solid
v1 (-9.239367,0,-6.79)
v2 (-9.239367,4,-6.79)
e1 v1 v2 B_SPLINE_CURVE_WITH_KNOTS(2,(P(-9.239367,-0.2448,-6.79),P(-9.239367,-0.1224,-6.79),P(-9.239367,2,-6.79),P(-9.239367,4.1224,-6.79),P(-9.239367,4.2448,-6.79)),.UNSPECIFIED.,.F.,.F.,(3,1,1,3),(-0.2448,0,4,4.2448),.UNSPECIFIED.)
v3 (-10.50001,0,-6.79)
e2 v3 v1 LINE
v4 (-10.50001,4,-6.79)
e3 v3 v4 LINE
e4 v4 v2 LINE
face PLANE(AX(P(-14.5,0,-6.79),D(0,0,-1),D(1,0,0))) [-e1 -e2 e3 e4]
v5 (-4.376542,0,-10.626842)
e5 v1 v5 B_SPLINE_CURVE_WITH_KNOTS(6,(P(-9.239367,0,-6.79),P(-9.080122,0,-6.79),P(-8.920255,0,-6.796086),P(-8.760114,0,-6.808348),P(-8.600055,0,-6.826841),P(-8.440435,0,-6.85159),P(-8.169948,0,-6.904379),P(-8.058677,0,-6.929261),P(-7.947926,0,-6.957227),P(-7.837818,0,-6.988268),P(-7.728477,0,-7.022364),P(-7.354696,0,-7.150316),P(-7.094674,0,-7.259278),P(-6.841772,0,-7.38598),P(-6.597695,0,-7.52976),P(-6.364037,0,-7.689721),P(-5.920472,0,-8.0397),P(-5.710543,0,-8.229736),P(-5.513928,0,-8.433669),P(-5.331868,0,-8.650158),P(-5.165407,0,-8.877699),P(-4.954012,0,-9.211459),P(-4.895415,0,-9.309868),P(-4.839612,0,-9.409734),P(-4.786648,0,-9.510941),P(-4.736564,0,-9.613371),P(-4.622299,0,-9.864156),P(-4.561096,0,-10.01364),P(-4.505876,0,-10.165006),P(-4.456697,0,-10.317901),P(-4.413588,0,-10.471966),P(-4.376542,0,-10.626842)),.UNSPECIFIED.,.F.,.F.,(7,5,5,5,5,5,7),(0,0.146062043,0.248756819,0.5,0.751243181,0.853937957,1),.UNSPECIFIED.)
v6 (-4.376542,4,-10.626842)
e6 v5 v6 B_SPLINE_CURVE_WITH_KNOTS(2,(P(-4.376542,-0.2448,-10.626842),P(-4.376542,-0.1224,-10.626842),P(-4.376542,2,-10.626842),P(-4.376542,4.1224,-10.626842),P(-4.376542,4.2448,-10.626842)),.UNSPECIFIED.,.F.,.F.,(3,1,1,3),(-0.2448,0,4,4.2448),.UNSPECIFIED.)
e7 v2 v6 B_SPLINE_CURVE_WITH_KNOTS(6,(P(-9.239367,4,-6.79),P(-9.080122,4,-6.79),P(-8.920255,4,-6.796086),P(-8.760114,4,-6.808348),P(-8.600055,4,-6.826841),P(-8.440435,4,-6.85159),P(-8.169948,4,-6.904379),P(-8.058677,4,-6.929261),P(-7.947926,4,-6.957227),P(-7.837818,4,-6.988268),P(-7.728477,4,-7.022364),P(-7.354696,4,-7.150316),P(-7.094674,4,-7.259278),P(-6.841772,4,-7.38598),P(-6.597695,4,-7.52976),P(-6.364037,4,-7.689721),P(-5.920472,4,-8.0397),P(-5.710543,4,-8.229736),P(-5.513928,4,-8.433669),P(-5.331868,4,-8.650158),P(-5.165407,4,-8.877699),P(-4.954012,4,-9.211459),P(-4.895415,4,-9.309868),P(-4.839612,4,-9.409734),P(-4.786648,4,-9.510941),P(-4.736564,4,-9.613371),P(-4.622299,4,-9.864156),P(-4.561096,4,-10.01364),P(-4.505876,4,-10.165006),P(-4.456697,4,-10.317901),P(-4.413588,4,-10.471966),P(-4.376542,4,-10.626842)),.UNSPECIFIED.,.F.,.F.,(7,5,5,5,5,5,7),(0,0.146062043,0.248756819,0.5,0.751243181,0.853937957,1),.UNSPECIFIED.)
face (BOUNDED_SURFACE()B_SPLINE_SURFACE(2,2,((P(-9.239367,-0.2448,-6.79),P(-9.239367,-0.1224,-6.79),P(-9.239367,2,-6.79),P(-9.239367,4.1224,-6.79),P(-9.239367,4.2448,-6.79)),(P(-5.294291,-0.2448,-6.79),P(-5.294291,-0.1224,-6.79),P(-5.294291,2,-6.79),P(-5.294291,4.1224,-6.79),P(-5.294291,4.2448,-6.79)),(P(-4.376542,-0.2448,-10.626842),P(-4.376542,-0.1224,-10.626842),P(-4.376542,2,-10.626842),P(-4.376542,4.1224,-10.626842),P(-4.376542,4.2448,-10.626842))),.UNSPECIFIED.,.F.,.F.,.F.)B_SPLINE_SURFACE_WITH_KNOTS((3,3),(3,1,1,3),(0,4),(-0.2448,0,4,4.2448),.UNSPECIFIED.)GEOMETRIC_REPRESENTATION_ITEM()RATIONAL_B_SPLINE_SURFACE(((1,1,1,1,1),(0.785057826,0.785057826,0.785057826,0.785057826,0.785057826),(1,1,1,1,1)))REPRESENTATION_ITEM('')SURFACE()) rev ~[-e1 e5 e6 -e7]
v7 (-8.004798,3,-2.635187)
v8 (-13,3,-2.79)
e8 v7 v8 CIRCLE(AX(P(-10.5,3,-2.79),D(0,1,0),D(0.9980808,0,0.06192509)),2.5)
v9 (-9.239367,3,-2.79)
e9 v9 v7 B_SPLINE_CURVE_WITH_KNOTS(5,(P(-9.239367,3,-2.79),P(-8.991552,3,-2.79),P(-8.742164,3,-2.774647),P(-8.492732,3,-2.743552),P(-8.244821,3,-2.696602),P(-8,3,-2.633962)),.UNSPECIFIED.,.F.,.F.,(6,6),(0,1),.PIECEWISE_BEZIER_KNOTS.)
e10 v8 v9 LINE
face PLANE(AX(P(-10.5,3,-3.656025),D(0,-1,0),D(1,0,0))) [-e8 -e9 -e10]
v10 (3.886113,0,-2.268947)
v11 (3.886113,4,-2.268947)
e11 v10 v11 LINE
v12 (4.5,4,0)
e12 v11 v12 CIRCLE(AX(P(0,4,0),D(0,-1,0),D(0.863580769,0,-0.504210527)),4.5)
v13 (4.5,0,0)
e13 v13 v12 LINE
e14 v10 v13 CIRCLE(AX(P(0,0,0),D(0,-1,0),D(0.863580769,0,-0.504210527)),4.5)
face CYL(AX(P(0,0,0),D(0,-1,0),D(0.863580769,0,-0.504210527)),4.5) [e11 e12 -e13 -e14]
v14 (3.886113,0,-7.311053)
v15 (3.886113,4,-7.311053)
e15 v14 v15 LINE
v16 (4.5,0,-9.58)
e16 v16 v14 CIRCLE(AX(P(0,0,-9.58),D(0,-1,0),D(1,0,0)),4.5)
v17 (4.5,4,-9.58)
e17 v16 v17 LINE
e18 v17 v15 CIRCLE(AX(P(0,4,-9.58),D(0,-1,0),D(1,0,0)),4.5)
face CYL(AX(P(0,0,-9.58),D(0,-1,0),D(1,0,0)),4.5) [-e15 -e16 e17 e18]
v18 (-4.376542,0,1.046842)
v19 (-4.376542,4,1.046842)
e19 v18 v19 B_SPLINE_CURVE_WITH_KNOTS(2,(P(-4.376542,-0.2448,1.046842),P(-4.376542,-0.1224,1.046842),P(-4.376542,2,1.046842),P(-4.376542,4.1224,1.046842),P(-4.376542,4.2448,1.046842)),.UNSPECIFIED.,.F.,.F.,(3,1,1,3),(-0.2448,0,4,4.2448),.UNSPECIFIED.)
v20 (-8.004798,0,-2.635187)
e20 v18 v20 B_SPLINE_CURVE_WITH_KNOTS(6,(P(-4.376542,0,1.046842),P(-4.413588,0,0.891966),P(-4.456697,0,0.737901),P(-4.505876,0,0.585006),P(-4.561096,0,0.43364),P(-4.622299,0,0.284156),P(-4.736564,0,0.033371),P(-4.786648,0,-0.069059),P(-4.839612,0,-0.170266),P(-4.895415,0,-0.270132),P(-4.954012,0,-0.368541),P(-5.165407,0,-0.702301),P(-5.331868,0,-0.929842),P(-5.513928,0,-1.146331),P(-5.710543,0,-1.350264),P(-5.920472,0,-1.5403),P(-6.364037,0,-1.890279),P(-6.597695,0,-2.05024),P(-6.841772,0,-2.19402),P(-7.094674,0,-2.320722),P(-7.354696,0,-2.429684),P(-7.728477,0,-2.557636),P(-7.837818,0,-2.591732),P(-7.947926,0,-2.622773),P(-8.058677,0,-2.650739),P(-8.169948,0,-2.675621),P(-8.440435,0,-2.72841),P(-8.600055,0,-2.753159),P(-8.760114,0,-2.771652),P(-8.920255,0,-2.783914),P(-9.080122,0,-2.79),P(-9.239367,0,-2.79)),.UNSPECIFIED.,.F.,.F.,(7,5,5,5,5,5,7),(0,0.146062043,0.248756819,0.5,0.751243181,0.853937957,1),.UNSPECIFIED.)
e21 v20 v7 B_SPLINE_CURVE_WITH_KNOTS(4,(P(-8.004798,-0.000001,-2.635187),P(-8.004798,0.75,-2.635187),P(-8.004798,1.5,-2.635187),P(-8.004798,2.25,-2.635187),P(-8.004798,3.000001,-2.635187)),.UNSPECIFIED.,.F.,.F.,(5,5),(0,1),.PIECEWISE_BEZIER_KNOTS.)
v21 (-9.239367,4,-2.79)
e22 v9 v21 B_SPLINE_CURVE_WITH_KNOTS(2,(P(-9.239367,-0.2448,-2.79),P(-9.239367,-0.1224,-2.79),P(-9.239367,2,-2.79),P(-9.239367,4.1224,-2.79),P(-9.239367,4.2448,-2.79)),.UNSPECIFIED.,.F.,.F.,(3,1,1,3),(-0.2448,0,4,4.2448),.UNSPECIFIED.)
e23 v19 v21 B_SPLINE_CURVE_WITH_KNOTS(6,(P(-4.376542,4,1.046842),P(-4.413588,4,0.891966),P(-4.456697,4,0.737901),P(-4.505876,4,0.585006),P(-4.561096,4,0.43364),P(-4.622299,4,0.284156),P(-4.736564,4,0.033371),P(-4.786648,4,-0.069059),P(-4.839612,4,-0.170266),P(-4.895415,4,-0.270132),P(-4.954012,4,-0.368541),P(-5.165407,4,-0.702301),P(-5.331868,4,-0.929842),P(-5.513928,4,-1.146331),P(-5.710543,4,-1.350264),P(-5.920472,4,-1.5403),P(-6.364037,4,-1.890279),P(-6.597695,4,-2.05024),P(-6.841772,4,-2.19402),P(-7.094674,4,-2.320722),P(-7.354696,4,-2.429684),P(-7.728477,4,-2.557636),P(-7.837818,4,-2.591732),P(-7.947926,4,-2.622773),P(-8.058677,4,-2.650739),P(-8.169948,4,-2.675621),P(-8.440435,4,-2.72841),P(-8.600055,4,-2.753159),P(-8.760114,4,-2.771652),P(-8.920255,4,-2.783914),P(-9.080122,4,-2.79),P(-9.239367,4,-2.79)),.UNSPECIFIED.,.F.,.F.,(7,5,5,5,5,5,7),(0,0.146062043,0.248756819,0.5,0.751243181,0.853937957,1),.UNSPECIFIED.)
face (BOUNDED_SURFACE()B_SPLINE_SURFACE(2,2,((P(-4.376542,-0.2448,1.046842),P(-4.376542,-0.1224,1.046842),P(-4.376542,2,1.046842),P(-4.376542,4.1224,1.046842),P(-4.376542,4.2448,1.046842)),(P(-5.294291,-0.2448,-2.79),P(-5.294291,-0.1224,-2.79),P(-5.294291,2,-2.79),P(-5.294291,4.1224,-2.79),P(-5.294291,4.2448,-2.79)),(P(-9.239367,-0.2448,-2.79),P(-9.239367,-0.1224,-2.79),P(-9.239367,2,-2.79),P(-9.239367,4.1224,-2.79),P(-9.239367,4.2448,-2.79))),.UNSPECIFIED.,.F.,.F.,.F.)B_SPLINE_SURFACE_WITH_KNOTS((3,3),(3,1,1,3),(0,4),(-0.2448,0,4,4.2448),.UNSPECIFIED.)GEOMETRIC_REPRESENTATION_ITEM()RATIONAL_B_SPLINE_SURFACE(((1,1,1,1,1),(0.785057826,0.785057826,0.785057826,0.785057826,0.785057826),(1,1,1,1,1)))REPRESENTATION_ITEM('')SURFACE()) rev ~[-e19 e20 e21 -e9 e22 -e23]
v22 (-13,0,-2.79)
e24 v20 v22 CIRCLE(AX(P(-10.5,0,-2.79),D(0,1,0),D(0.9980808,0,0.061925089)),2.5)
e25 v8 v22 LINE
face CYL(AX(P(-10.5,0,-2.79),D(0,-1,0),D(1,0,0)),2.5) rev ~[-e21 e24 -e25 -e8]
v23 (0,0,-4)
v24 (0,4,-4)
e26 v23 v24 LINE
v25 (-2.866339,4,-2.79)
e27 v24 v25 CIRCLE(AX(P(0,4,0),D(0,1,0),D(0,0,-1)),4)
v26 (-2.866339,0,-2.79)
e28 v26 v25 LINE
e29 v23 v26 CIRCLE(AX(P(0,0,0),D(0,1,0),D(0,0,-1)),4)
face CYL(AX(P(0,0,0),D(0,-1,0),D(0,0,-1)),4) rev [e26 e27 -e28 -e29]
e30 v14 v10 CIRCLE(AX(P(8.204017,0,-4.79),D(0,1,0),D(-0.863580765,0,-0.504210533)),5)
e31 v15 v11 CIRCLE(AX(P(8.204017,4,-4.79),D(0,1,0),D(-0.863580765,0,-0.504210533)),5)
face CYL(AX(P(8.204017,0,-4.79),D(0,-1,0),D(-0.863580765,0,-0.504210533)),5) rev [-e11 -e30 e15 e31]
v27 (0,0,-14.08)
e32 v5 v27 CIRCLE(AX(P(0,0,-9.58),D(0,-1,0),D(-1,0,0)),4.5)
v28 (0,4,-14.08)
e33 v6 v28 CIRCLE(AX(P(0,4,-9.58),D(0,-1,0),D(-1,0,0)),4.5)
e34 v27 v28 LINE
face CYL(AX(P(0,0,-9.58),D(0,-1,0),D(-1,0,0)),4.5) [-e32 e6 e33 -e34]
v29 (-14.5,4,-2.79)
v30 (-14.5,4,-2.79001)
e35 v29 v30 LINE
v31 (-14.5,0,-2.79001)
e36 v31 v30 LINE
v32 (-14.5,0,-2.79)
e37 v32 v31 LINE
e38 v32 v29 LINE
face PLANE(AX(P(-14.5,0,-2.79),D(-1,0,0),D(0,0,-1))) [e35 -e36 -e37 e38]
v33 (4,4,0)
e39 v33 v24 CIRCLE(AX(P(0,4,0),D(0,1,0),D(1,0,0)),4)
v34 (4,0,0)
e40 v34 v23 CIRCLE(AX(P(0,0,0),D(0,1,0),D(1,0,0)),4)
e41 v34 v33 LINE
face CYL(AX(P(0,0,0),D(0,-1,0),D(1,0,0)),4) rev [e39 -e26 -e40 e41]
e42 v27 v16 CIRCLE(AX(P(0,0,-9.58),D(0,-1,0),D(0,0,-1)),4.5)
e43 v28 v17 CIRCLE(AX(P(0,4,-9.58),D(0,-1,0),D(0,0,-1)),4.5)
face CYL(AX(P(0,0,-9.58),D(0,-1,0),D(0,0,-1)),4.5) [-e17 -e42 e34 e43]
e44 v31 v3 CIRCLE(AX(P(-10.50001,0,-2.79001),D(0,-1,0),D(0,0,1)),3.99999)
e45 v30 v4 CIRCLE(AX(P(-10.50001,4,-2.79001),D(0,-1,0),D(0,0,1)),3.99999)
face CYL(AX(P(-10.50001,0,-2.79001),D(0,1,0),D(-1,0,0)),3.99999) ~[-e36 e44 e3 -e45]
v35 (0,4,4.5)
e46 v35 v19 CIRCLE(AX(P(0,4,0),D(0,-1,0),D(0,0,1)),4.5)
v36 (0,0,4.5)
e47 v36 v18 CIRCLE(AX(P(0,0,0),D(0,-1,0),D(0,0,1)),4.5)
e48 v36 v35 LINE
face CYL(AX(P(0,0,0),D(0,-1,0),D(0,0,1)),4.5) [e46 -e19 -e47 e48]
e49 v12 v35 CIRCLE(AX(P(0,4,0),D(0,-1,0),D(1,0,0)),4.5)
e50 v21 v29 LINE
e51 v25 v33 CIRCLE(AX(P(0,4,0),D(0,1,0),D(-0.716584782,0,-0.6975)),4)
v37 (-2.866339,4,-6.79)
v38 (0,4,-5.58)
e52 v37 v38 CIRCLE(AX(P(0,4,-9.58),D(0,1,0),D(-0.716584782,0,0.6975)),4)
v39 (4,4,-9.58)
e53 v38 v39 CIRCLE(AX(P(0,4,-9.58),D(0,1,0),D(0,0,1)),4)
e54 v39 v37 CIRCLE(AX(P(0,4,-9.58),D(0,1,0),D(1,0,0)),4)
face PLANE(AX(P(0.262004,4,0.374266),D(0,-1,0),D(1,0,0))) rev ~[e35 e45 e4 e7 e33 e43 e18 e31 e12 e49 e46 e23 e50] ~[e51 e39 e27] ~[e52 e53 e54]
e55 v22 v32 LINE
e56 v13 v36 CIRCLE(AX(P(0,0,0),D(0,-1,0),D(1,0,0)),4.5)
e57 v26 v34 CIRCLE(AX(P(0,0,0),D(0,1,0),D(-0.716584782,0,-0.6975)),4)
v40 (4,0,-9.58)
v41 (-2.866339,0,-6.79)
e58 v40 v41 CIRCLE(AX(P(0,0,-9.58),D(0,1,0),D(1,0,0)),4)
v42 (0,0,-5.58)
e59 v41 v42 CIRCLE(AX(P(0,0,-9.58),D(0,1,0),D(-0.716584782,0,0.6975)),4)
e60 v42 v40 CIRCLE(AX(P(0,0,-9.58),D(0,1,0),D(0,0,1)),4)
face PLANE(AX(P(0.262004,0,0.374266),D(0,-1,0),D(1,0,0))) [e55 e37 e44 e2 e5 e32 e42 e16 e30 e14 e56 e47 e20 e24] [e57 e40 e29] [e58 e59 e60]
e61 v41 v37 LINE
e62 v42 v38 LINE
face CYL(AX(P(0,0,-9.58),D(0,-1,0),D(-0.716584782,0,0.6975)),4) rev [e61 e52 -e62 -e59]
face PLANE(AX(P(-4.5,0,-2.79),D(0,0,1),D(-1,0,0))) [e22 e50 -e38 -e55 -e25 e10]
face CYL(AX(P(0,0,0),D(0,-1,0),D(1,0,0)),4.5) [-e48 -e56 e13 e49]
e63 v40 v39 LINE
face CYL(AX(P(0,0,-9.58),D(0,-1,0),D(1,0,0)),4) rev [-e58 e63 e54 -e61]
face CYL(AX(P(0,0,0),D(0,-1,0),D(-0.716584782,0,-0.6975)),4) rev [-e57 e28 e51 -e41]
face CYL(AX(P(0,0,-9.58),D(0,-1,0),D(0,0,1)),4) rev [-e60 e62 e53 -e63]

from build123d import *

# Parameters (mm, degrees)
F1_DEPTH = 4
F2_R     = 5
F3_R     = 3.99999
F4_DEPTH = 3


# Not quite as in the source:
# - a fillet or chamfer is up to 0.001 mm smaller than in the source, because OpenCascade refuses the exact size


with BuildPart() as f1:
    # F0 (on Front) → F1 (new body)
    with BuildSketch(Plane.XZ):
        with BuildLine():
            ThreePointArc((4.5, 0), (3.1819805153, 3.1819805153), (0, 4.5))
            ThreePointArc((0, 4.5), (-3.1819805153, 3.1819805153), (-4.5, 0))
            ThreePointArc((-4.5, 0), (-4.2507756145, -1.4767893131), (-3.5307081443, -2.79))
            Line((-3.5307081443, -2.79), (-2.8663391286, -2.79))
            ThreePointArc((-2.8663391286, -2.79), (-1.5057628442, 3.7057628442), (4, 0))
            ThreePointArc((4, 0), (2.8284271247, -2.8284271247), (0, -4))
            Line((0, -4), (0, -4.5))
            ThreePointArc((0, -4.5), (2.2405062847, -3.9025801194), (3.8861134595, -2.2689473726))
            ThreePointArc((3.8861134595, -2.2689473726), (4.3438180537, -1.1752636794), (4.5, 0))
        make_face()
        with BuildLine():
            ThreePointArc((4.5, -9.58), (4.3438180596, -8.4047363422), (3.886113482, -7.3110526659))
            ThreePointArc((3.886113482, -7.3110526659), (2.240506304, -5.6774198917), (0, -5.08))
            Line((0, -5.08), (0, -5.58))
            ThreePointArc((0, -5.58), (2.8284271247, -6.7515728753), (4, -9.58))
            ThreePointArc((4, -9.58), (-1.5057628442, -13.2857628442), (-2.8663391286, -6.79))
            Line((-2.8663391286, -6.79), (-3.5307081443, -6.79))
            ThreePointArc((-3.5307081443, -6.79), (-4.2507756145, -8.1032106869), (-4.5, -9.58))
            ThreePointArc((-4.5, -9.58), (-3.1819805153, -12.7619805153), (0, -14.08))
            ThreePointArc((0, -14.08), (3.1819805153, -12.7619805153), (4.5, -9.58))
        make_face()
        with BuildLine():
            Line((-2.8663391286, -2.79), (-3.5307081443, -2.79))
            ThreePointArc((-3.5307081443, -2.79), (-1.9615045246, -4.05), (0, -4.5))
            Line((0, -4.5), (0, -4))
            ThreePointArc((0, -4), (-1.5556349186, -3.6851051545), (-2.8663391286, -2.79))
        make_face()
        with BuildLine():
            ThreePointArc((0, -5.08), (-1.9615045246, -5.53), (-3.5307081443, -6.79))
            Line((-3.5307081443, -6.79), (-2.8663391286, -6.79))
            ThreePointArc((-2.8663391286, -6.79), (-1.5556349186, -5.8948948455), (0, -5.58))
            Line((0, -5.58), (0, -5.08))
        make_face()
        with BuildLine():
            Line((-3.5307081443, -2.79), (-4.5, -2.79))
            Line((-4.5, -2.79), (-4.5, -6.79))
            Line((-4.5, -6.79), (-3.5307081443, -6.79))
            ThreePointArc((-3.5307081443, -6.79), (-1.9615045246, -5.53), (0, -5.08))
            Line((0, -5.08), (0, -4.5))
            ThreePointArc((0, -4.5), (-1.9615045246, -4.05), (-3.5307081443, -2.79))
        make_face()
        with BuildLine():
            ThreePointArc((-3.5307081443, -2.79), (-4.2507756145, -1.4767893131), (-4.5, 0))
            Line((-4.5, 0), (-4.5, -2.79))
            Line((-4.5, -2.79), (-3.5307081443, -2.79))
        make_face()
        with BuildLine():
            Line((-3.5307081443, -6.79), (-4.5, -6.79))
            Line((-4.5, -6.79), (-4.5, -9.58))
            ThreePointArc((-4.5, -9.58), (-4.2507756145, -8.1032106869), (-3.5307081443, -6.79))
        make_face()
        with BuildLine():
            Line((-4.5, -6.79), (-4.5, -2.79))
            Line((-4.5, -2.79), (-8, -2.79))
            ThreePointArc((-8, -2.79), (-10.5, -5.29), (-13, -2.79))
            Line((-13, -2.79), (-14.5, -2.79))
            Line((-14.5, -2.79), (-14.5, -6.79))
            Line((-14.5, -6.79), (-4.5, -6.79))
        make_face()
        with BuildLine():
            ThreePointArc((-13, -2.79), (-10.5, -5.29), (-8, -2.79))
            Line((-8, -2.79), (-13, -2.79))
        make_face()
        with BuildLine():
            ThreePointArc((3.886113482, -7.3110526659), (3.2040173086, -4.7900000223), (3.8861134595, -2.2689473726))
            ThreePointArc((3.8861134595, -2.2689473726), (2.2405062847, -3.9025801194), (0, -4.5))
            Line((0, -4.5), (0, -5.08))
            ThreePointArc((0, -5.08), (2.240506304, -5.6774198917), (3.886113482, -7.3110526659))
        make_face()
    extrude(amount=-F1_DEPTH)

    # F2
    f2_edges = [f1.edges().sort_by_distance(p)[0] for p in [
        (-4.5, 2, -2.79),
        (-4.5, 2, -6.79),
    ]]
    fillet(f2_edges, radius=F2_R)

    # F3 (radius 4 in the source; OpenCascade refuses exactly that, so slightly less here)
    f3_edges = [f1.edges().sort_by_distance(p)[0] for p in [
        (-14.5, 2, -6.79),
    ]]
    fillet(f3_edges, radius=F3_R)

    # F0 (on Front) → F4 (cut)
    with BuildSketch(Plane.XZ):
        with BuildLine():
            ThreePointArc((-13, -2.79), (-10.5, -5.29), (-8, -2.79))
            Line((-8, -2.79), (-13, -2.79))
        make_face()
        with BuildLine():
            Line((-13, -2.79), (-8, -2.79))
            ThreePointArc((-8, -2.79), (-10.5, -0.29), (-13, -2.79))
        make_face()
    extrude(amount=-F4_DEPTH, mode=Mode.SUBTRACT)


solid = f1.part
